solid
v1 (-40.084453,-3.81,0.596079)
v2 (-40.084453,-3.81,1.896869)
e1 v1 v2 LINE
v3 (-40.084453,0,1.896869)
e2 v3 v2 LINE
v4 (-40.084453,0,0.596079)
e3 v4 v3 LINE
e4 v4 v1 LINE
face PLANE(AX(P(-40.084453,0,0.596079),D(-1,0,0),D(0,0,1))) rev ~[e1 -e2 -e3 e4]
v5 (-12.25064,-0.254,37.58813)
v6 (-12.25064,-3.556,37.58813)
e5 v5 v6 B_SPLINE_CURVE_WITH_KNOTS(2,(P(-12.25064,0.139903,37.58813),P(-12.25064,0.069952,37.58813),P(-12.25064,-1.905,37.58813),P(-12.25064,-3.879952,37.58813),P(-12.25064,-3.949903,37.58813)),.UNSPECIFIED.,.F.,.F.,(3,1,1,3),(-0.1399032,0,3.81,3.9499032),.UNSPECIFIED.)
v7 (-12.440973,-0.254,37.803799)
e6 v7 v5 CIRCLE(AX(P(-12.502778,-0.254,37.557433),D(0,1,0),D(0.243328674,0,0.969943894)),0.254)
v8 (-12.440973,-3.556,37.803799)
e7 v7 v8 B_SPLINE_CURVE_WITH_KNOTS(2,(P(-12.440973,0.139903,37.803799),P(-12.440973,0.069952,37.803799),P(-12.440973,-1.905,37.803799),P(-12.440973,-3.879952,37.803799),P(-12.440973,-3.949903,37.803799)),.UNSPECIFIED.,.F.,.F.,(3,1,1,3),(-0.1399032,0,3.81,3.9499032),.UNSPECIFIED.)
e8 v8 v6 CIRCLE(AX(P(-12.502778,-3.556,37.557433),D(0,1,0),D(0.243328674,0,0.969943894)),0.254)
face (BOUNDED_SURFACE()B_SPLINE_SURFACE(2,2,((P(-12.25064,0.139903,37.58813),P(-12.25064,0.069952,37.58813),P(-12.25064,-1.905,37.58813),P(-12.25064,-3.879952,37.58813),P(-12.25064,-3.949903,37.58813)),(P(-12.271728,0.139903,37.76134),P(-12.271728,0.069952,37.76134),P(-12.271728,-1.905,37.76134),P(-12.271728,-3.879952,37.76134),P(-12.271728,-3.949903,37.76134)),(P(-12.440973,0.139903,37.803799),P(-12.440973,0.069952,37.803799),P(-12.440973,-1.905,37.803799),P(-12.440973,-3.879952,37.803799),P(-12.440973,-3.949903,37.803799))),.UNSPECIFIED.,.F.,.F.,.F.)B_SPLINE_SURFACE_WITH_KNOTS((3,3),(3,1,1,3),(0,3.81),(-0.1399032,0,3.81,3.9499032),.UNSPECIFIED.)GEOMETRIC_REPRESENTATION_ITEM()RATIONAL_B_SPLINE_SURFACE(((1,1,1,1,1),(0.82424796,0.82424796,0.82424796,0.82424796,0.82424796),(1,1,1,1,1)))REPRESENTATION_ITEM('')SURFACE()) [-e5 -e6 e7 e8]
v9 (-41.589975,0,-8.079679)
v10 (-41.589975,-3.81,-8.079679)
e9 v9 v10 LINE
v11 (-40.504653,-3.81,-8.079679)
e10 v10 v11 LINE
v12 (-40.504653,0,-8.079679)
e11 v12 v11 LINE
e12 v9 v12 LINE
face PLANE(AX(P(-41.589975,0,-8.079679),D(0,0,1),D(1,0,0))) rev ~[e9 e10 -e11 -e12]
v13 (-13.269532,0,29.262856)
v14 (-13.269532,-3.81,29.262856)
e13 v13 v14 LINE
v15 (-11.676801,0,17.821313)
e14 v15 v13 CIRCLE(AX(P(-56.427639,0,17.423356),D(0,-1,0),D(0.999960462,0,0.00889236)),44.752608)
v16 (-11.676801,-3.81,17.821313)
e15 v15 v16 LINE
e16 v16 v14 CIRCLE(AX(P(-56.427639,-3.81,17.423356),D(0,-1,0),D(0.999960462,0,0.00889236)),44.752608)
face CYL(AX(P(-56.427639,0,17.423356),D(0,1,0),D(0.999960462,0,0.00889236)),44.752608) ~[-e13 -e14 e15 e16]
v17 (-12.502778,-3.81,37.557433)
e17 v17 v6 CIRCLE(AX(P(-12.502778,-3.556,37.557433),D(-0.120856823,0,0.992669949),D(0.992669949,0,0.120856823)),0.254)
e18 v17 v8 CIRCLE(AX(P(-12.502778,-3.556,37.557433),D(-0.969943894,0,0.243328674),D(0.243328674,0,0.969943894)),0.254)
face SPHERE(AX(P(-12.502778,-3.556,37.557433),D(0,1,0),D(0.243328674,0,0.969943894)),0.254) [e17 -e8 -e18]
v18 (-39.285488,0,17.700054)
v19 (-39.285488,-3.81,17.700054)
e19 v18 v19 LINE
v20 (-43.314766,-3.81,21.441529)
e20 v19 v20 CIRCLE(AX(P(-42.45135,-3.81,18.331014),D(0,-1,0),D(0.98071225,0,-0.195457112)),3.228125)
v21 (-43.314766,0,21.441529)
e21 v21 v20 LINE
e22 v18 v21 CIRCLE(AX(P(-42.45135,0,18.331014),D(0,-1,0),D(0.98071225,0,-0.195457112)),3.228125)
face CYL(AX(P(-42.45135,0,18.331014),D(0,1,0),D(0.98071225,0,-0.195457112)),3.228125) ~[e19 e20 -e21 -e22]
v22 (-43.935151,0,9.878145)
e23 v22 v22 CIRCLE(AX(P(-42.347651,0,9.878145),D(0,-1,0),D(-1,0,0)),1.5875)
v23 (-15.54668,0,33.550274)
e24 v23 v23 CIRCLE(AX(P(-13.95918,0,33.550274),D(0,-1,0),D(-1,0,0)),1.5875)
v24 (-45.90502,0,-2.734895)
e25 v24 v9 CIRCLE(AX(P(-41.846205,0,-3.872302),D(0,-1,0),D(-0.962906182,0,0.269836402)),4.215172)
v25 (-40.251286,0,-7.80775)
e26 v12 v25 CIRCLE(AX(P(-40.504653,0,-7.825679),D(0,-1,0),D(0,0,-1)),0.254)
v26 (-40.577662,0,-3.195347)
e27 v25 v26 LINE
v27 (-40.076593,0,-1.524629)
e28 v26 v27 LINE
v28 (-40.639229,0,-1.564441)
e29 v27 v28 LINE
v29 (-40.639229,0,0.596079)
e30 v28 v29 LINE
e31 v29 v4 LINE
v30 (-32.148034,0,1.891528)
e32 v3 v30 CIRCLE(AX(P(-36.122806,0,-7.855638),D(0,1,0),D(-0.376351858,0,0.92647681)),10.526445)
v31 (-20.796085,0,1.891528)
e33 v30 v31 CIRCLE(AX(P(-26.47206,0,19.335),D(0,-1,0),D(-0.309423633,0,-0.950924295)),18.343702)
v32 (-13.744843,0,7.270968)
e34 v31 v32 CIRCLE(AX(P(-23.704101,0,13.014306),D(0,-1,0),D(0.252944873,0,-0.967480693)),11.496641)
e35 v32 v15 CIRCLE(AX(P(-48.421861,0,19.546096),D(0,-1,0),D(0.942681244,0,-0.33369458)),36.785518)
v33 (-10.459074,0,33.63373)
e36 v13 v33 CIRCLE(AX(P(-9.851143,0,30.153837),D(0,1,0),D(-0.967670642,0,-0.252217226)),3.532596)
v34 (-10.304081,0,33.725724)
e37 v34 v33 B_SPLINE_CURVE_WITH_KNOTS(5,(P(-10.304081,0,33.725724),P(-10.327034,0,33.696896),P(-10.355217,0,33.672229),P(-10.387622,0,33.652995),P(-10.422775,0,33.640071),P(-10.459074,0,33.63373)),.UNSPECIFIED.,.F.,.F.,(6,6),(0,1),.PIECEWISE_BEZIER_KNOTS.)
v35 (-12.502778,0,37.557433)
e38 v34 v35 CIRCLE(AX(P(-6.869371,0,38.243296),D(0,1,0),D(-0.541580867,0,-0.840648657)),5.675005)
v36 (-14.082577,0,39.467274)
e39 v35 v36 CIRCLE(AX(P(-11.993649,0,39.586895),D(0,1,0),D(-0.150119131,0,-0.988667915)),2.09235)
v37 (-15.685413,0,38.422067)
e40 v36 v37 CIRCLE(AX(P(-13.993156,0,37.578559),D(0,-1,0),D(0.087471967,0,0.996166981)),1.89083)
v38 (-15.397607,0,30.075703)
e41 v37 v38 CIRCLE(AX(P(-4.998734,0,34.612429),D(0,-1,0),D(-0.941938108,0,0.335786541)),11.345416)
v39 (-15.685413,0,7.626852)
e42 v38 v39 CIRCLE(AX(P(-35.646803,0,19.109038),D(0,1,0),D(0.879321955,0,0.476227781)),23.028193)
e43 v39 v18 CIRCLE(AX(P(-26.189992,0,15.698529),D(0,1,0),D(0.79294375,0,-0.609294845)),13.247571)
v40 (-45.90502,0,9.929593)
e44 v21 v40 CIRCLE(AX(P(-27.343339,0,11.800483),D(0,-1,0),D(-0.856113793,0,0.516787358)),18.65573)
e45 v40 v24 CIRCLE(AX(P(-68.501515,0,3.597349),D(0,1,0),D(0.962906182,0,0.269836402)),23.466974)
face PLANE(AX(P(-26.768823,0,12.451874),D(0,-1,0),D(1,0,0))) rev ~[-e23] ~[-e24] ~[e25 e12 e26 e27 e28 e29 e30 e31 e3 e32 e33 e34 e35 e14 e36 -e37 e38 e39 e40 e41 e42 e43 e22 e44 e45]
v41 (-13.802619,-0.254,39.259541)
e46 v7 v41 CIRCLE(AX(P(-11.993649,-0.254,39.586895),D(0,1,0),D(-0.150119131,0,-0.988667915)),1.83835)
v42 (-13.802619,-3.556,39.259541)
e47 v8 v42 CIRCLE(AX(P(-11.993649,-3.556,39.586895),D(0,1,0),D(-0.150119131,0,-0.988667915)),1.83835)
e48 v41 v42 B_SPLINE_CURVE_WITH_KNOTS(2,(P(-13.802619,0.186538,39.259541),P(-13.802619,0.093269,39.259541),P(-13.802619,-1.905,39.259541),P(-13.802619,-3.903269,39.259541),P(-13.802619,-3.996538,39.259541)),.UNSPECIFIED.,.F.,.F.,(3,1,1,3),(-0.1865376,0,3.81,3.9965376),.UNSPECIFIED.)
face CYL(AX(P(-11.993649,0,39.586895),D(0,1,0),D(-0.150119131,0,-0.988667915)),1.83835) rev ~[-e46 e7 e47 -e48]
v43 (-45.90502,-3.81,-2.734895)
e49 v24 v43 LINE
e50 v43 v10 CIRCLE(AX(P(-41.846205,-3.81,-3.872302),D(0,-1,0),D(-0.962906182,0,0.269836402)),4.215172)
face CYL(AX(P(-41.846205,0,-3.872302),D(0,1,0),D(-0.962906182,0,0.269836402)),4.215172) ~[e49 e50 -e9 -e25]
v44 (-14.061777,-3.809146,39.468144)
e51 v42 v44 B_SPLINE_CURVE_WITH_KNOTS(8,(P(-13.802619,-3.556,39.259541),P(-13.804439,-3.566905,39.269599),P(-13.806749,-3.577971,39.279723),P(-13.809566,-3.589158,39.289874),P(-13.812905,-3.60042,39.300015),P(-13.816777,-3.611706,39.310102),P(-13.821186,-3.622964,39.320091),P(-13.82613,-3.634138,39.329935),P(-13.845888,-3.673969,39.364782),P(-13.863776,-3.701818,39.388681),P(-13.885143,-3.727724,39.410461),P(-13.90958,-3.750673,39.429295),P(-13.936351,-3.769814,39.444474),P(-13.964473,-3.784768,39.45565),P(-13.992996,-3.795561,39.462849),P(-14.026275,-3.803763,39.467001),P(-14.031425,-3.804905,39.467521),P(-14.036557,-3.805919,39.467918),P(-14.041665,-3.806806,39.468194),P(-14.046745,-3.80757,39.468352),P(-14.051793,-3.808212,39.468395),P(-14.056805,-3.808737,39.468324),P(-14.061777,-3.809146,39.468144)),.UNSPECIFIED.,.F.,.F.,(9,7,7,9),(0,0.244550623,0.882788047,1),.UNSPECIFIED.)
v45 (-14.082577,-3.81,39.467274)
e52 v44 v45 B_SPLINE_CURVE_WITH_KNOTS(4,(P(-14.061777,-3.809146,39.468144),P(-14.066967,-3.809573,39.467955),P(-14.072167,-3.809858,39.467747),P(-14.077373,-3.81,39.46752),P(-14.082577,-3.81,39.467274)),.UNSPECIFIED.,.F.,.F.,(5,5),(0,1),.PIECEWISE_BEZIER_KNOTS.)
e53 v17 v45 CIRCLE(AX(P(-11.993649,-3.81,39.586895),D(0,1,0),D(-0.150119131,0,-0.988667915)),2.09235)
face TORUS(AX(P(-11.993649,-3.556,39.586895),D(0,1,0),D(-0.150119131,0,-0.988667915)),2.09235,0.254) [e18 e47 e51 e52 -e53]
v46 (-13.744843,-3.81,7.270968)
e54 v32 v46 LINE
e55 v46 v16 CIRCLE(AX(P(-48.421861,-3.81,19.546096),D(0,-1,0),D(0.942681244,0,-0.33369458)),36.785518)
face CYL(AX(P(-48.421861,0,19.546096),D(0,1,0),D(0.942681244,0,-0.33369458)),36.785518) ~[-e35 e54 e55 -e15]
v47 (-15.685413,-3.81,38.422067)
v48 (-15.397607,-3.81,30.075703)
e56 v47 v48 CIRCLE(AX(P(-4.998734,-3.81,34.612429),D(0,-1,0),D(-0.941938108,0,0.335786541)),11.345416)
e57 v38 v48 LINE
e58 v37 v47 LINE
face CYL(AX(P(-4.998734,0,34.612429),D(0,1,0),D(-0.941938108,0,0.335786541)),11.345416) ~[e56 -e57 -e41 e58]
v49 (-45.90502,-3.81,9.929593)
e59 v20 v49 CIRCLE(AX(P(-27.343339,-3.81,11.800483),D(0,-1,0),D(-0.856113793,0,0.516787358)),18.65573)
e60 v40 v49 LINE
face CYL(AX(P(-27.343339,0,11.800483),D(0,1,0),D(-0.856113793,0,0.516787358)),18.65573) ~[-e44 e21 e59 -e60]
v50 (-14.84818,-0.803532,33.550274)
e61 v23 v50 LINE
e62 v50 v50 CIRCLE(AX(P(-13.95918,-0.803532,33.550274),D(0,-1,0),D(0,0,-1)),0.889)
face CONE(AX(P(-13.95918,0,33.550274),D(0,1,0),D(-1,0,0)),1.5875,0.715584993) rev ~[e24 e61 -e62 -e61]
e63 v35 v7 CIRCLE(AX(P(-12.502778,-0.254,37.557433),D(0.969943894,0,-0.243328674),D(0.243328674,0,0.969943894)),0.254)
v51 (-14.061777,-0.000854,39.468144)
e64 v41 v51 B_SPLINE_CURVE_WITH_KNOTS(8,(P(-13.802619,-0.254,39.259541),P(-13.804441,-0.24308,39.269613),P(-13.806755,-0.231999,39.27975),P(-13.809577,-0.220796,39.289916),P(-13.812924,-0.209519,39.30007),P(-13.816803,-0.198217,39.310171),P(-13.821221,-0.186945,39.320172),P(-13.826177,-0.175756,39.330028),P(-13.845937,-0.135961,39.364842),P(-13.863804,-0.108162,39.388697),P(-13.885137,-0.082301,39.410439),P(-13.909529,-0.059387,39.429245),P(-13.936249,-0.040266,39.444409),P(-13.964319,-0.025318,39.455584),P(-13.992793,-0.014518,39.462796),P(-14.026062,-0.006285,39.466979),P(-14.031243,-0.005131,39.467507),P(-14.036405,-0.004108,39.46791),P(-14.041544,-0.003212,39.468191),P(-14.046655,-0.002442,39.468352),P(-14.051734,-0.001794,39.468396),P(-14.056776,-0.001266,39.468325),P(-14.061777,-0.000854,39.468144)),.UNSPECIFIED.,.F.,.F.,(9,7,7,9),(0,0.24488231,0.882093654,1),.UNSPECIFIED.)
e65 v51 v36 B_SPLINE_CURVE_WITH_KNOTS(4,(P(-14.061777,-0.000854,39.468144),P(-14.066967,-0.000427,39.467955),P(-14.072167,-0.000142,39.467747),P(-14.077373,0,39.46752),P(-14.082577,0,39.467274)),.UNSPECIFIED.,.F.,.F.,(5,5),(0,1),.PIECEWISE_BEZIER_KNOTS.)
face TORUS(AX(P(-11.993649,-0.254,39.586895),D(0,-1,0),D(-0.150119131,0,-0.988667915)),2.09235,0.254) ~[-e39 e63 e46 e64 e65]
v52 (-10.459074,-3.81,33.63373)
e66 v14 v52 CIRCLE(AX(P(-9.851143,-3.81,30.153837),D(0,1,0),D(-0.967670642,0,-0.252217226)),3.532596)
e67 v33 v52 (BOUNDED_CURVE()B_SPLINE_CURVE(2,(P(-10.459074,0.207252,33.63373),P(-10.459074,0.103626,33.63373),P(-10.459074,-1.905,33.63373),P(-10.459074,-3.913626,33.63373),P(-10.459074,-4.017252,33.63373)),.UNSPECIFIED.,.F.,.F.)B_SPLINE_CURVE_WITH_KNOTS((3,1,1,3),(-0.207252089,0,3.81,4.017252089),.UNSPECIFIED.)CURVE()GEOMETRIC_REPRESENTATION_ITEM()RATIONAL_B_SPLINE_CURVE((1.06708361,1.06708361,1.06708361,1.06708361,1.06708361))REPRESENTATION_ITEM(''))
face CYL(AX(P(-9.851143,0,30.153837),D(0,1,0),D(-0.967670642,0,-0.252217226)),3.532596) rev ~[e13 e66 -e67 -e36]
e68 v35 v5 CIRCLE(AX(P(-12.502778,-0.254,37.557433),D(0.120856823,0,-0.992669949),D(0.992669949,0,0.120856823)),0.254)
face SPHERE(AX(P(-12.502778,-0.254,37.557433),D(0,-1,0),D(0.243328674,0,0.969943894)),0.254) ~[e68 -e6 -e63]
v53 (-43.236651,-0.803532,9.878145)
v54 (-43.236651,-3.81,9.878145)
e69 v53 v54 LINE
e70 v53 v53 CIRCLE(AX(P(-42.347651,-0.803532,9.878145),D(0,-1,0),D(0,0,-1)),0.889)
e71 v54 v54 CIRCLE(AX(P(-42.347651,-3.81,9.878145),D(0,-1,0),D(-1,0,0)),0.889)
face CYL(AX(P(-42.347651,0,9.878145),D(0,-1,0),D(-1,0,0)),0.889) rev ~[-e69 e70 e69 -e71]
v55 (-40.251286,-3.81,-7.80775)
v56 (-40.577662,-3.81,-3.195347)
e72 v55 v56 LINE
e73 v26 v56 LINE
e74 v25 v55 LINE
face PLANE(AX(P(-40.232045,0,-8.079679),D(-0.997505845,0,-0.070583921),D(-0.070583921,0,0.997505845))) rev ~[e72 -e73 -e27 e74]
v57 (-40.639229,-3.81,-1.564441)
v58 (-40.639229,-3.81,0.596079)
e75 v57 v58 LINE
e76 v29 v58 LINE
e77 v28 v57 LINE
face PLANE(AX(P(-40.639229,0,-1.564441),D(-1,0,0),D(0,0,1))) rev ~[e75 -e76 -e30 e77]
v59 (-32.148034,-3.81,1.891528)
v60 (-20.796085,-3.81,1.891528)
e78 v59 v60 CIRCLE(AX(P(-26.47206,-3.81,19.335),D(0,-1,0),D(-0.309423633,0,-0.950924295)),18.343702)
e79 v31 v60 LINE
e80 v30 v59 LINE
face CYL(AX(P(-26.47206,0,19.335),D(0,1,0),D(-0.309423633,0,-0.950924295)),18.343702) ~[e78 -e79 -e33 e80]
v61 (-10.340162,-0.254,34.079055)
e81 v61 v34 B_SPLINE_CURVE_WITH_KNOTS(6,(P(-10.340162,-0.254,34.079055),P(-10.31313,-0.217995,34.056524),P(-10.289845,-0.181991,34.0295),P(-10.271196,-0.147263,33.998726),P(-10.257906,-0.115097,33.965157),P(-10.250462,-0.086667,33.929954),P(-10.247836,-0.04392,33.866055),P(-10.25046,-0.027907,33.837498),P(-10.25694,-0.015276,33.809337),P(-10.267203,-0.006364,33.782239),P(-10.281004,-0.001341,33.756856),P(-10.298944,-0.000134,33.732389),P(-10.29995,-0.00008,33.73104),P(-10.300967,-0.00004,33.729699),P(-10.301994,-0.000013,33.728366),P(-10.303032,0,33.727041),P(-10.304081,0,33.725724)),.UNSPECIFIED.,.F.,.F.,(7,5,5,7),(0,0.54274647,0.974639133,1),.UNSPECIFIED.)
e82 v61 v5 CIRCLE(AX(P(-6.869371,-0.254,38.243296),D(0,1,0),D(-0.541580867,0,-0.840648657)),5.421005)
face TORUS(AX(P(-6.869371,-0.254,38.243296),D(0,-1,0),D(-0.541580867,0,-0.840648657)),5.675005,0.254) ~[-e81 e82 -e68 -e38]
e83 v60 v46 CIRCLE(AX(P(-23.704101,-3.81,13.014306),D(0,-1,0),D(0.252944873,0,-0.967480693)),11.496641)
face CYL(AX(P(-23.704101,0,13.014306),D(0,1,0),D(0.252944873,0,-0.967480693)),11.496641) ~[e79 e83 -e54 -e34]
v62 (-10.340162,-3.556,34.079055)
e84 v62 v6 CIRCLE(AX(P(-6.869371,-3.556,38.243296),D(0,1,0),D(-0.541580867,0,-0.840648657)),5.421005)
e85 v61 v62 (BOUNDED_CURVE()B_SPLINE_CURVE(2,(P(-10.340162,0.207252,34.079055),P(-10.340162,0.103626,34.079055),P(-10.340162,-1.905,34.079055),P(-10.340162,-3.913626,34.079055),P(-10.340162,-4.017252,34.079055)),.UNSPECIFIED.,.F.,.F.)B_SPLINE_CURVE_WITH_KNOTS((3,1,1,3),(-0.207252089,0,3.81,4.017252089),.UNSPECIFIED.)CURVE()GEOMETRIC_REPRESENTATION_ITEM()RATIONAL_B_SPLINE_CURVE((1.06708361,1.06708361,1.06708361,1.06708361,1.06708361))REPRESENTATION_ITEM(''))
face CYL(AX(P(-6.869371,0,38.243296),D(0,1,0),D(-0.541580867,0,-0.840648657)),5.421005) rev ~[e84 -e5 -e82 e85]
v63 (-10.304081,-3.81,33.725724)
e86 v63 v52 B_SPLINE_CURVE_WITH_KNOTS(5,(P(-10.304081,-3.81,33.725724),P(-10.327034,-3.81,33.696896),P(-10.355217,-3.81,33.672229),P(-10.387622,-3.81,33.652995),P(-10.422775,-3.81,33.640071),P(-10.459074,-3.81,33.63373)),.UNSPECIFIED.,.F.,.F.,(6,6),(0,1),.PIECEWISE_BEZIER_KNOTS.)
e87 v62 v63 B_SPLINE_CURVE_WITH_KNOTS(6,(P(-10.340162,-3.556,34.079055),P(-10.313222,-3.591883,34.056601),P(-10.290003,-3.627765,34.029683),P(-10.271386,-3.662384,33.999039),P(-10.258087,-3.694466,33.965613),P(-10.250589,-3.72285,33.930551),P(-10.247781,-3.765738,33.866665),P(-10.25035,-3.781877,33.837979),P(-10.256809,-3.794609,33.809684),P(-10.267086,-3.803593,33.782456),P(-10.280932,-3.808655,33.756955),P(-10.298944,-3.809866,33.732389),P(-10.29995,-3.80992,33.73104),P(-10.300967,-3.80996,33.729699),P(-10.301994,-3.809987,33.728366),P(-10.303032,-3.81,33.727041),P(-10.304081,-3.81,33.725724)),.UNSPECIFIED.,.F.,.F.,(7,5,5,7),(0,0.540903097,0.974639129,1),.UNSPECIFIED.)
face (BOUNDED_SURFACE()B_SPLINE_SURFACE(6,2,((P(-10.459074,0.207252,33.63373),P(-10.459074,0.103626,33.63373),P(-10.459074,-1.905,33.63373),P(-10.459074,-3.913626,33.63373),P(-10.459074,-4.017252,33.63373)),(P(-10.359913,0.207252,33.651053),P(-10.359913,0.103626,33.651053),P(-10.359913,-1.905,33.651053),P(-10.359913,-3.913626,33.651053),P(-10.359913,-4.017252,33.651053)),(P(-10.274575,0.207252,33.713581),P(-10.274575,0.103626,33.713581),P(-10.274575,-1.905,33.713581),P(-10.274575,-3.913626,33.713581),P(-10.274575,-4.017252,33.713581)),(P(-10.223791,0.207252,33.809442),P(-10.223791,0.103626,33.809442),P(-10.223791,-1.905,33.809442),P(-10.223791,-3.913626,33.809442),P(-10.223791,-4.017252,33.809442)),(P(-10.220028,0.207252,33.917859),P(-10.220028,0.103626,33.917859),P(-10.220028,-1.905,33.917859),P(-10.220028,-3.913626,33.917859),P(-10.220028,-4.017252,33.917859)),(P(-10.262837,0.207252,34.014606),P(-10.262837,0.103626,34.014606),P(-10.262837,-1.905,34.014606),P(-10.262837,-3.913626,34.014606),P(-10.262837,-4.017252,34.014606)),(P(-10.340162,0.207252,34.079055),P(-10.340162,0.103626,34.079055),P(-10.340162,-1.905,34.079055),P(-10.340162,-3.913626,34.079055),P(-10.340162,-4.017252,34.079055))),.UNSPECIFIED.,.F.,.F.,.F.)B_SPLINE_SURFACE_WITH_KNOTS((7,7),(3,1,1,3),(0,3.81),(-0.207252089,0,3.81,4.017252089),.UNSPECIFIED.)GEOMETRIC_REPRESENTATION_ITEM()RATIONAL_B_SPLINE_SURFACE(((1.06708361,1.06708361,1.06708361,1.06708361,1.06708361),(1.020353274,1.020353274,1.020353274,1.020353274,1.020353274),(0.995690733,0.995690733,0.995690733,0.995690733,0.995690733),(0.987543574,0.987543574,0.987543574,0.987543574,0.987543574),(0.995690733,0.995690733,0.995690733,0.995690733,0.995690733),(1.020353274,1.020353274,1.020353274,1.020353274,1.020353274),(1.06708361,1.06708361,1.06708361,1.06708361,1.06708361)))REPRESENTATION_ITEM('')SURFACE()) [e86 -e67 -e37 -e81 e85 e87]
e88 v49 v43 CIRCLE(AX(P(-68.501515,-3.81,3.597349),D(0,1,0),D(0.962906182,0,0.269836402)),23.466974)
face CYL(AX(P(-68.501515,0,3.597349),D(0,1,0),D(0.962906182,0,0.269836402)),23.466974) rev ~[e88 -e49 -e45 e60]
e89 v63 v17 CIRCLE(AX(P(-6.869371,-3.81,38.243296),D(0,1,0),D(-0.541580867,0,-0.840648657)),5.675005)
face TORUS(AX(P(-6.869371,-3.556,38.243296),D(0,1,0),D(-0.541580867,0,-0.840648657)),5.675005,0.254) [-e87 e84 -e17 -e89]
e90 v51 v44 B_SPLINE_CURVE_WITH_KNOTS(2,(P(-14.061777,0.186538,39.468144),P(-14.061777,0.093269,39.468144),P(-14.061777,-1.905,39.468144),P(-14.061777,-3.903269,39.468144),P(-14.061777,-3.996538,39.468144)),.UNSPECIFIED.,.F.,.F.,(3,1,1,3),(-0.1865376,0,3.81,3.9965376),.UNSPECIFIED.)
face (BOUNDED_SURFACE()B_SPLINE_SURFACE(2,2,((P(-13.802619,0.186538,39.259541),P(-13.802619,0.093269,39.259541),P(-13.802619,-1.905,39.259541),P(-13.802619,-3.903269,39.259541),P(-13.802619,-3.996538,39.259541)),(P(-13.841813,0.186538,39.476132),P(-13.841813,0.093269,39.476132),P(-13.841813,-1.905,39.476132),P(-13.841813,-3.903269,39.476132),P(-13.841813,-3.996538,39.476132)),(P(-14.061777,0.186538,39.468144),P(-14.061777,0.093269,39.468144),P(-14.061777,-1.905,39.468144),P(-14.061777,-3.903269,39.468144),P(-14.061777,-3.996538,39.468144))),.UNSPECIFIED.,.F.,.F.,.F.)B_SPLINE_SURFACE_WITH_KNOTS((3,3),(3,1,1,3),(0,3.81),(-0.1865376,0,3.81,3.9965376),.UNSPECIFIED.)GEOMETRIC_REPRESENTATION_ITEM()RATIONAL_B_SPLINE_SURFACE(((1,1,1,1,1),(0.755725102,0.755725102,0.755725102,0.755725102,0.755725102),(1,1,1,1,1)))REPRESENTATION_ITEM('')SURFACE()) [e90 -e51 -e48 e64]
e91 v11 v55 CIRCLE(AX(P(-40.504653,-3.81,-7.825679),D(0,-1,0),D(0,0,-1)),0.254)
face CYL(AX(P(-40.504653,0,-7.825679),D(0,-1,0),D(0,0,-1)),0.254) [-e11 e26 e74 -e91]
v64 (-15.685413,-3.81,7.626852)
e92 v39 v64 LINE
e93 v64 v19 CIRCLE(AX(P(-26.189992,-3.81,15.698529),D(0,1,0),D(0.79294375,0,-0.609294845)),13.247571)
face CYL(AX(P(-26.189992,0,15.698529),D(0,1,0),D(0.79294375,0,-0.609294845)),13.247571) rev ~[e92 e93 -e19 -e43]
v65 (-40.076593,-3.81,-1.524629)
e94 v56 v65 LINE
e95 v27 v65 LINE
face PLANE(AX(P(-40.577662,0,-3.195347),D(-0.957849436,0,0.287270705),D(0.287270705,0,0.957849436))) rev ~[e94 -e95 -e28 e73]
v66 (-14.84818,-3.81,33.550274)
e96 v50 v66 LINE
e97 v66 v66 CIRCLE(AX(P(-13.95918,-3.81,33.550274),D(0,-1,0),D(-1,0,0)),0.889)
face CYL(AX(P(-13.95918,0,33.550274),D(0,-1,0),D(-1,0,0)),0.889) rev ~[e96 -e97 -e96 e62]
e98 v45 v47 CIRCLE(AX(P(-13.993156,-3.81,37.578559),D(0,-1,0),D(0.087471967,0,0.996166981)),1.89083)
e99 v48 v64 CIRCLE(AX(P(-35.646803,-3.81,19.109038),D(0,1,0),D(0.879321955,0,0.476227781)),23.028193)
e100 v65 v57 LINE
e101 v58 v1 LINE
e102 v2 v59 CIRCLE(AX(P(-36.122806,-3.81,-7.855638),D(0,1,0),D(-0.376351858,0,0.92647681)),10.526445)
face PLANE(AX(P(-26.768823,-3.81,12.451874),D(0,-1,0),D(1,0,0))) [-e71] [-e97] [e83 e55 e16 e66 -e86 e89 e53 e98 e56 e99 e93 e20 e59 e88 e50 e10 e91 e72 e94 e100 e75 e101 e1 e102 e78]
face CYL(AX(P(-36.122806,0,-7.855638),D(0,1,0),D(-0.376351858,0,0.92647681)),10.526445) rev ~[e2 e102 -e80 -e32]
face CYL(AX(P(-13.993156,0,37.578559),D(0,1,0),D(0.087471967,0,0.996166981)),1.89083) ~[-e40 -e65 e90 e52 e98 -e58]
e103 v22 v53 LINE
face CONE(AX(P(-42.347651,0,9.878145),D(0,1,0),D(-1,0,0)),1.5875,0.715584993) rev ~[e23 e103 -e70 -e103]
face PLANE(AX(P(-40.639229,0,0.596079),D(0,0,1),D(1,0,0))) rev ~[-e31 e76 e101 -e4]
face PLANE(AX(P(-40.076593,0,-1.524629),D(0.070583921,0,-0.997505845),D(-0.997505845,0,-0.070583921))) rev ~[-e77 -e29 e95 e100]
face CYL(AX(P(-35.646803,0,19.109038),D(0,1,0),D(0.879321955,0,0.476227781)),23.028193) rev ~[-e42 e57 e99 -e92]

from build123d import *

# Parameters (mm, degrees)
F1_DEPTH       = 3.81
F2_R           = 0.254
F3_D           = 1.778
F3_CSINK_D     = 3.175
F3_CSINK_ANGLE = 82


# Not quite as in the source:
# - a feature names something its author has since deleted; it is built from what else it names


with BuildPart() as f1:
    # F0 (on Front) → F1 (new body)
    with BuildSketch(Plane.XZ):
        with BuildLine():
            ThreePointArc((-15.3976073489, 30.0757028162), (-12.6205023663, 18.8138288447), (-15.6854130328, 7.6268524863))
            ThreePointArc((-15.6854130328, 7.6268524863), (-31.3905262472, 3.5144175537), (-39.2854884267, 17.7000537515))
            ThreePointArc((-39.2854884267, 17.7000537515), (-40.2547680717, 20.6965618199), (-43.3147661388, 21.4415285736))
            ThreePointArc((-43.3147661388, 21.4415285736), (-45.5440273695, 15.8957464039), (-45.905020088, 9.9295927212))
            ThreePointArc((-45.905020088, 9.9295927212), (-45.0345404234, 3.597348812), (-45.905020088, -2.7348950971))
            ThreePointArc((-45.905020088, -2.7348950971), (-45.1259294206, -6.5201466433), (-41.5899753571, -8.0796787515))
            Line((-41.5899753571, -8.0796787515), (-40.2320445972, -8.0796787515))
            Line((-40.2320445972, -8.0796787515), (-40.5776619182, -3.1953468446))
            Line((-40.5776619182, -3.1953468446), (-40.0765932374, -1.5246287875))
            Line((-40.0765932374, -1.5246287875), (-40.6392291188, -1.5644411324))
            Line((-40.6392291188, -1.5644411324), (-40.6392291188, 0.5960793933))
            Line((-40.6392291188, 0.5960793933), (-40.0844532998, 0.5960793933))
            Line((-40.0844532998, 0.5960793933), (-40.0844532998, 1.8968694892))
            ThreePointArc((-40.0844532998, 1.8968694892), (-36.1157211919, 2.6708049351), (-32.1480344873, 1.8915278128))
            ThreePointArc((-32.1480344873, 1.8915278128), (-26.4720596319, 0.9912977201), (-20.7960847765, 1.8915278128))
            ThreePointArc((-20.7960847765, 1.8915278128), (-16.7308465178, 3.8739299722), (-13.7448431924, 7.2709675878))
            ThreePointArc((-13.7448431924, 7.2709675878), (-12.3233048625, 12.470180408), (-11.6768007285, 17.821312772))
            ThreePointArc((-11.6768007285, 17.821312772), (-12.1024444853, 23.5936908911), (-13.2695324719, 29.2628555023))
            ThreePointArc((-13.2695324719, 29.2628555023), (-12.6323011565, 32.3319998397), (-9.8052835092, 33.6861349642))
            ThreePointArc((-9.8052835092, 33.6861349642), (-11.5106118889, 35.4421925399), (-12.2696207836, 37.7693772316))
            ThreePointArc((-12.2696207836, 37.7693772316), (-13.3462306374, 38.3418830024), (-13.8277616352, 39.4621416926))
            ThreePointArc((-13.8277616352, 39.4621416926), (-14.9168802382, 39.2283992754), (-15.6854130328, 38.4220667183))
            ThreePointArc((-15.6854130328, 38.4220667183), (-16.3374101507, 34.221439938), (-15.3976073489, 30.0757028162))
        make_face()
    extrude(amount=F1_DEPTH)

    # F2
    f2_edges = [f1.edges().sort_by_distance(p)[0] for p in [
        (-45.90502, -1.905, -2.734895),
        (-13.827762, -1.905, 39.462142),
        (-12.269621, -1.905, 37.769377),
        (-13.346231, 0, 38.341883),
        (-13.346231, -3.81, 38.341883),
        (-11.510612, -3.81, 35.442193),
        (-11.510612, 0, 35.442193),
        (-9.805284, -1.905, 33.686135),
        (-40.232045, -1.905, -8.079679),
    ]]
    fillet(f2_edges, radius=F2_R)

    # F3 (through all)
    with Locations(Plane(origin=(0, 0, 0), x_dir=(1, 0, 0), z_dir=(0, 1, 0))):
        with Locations((-42.347650975, -9.8781445995), (-13.9591796324, -33.550273627)):
            CounterSinkHole(F3_D / 2, F3_CSINK_D / 2, counter_sink_angle=F3_CSINK_ANGLE)


solid = f1.part
